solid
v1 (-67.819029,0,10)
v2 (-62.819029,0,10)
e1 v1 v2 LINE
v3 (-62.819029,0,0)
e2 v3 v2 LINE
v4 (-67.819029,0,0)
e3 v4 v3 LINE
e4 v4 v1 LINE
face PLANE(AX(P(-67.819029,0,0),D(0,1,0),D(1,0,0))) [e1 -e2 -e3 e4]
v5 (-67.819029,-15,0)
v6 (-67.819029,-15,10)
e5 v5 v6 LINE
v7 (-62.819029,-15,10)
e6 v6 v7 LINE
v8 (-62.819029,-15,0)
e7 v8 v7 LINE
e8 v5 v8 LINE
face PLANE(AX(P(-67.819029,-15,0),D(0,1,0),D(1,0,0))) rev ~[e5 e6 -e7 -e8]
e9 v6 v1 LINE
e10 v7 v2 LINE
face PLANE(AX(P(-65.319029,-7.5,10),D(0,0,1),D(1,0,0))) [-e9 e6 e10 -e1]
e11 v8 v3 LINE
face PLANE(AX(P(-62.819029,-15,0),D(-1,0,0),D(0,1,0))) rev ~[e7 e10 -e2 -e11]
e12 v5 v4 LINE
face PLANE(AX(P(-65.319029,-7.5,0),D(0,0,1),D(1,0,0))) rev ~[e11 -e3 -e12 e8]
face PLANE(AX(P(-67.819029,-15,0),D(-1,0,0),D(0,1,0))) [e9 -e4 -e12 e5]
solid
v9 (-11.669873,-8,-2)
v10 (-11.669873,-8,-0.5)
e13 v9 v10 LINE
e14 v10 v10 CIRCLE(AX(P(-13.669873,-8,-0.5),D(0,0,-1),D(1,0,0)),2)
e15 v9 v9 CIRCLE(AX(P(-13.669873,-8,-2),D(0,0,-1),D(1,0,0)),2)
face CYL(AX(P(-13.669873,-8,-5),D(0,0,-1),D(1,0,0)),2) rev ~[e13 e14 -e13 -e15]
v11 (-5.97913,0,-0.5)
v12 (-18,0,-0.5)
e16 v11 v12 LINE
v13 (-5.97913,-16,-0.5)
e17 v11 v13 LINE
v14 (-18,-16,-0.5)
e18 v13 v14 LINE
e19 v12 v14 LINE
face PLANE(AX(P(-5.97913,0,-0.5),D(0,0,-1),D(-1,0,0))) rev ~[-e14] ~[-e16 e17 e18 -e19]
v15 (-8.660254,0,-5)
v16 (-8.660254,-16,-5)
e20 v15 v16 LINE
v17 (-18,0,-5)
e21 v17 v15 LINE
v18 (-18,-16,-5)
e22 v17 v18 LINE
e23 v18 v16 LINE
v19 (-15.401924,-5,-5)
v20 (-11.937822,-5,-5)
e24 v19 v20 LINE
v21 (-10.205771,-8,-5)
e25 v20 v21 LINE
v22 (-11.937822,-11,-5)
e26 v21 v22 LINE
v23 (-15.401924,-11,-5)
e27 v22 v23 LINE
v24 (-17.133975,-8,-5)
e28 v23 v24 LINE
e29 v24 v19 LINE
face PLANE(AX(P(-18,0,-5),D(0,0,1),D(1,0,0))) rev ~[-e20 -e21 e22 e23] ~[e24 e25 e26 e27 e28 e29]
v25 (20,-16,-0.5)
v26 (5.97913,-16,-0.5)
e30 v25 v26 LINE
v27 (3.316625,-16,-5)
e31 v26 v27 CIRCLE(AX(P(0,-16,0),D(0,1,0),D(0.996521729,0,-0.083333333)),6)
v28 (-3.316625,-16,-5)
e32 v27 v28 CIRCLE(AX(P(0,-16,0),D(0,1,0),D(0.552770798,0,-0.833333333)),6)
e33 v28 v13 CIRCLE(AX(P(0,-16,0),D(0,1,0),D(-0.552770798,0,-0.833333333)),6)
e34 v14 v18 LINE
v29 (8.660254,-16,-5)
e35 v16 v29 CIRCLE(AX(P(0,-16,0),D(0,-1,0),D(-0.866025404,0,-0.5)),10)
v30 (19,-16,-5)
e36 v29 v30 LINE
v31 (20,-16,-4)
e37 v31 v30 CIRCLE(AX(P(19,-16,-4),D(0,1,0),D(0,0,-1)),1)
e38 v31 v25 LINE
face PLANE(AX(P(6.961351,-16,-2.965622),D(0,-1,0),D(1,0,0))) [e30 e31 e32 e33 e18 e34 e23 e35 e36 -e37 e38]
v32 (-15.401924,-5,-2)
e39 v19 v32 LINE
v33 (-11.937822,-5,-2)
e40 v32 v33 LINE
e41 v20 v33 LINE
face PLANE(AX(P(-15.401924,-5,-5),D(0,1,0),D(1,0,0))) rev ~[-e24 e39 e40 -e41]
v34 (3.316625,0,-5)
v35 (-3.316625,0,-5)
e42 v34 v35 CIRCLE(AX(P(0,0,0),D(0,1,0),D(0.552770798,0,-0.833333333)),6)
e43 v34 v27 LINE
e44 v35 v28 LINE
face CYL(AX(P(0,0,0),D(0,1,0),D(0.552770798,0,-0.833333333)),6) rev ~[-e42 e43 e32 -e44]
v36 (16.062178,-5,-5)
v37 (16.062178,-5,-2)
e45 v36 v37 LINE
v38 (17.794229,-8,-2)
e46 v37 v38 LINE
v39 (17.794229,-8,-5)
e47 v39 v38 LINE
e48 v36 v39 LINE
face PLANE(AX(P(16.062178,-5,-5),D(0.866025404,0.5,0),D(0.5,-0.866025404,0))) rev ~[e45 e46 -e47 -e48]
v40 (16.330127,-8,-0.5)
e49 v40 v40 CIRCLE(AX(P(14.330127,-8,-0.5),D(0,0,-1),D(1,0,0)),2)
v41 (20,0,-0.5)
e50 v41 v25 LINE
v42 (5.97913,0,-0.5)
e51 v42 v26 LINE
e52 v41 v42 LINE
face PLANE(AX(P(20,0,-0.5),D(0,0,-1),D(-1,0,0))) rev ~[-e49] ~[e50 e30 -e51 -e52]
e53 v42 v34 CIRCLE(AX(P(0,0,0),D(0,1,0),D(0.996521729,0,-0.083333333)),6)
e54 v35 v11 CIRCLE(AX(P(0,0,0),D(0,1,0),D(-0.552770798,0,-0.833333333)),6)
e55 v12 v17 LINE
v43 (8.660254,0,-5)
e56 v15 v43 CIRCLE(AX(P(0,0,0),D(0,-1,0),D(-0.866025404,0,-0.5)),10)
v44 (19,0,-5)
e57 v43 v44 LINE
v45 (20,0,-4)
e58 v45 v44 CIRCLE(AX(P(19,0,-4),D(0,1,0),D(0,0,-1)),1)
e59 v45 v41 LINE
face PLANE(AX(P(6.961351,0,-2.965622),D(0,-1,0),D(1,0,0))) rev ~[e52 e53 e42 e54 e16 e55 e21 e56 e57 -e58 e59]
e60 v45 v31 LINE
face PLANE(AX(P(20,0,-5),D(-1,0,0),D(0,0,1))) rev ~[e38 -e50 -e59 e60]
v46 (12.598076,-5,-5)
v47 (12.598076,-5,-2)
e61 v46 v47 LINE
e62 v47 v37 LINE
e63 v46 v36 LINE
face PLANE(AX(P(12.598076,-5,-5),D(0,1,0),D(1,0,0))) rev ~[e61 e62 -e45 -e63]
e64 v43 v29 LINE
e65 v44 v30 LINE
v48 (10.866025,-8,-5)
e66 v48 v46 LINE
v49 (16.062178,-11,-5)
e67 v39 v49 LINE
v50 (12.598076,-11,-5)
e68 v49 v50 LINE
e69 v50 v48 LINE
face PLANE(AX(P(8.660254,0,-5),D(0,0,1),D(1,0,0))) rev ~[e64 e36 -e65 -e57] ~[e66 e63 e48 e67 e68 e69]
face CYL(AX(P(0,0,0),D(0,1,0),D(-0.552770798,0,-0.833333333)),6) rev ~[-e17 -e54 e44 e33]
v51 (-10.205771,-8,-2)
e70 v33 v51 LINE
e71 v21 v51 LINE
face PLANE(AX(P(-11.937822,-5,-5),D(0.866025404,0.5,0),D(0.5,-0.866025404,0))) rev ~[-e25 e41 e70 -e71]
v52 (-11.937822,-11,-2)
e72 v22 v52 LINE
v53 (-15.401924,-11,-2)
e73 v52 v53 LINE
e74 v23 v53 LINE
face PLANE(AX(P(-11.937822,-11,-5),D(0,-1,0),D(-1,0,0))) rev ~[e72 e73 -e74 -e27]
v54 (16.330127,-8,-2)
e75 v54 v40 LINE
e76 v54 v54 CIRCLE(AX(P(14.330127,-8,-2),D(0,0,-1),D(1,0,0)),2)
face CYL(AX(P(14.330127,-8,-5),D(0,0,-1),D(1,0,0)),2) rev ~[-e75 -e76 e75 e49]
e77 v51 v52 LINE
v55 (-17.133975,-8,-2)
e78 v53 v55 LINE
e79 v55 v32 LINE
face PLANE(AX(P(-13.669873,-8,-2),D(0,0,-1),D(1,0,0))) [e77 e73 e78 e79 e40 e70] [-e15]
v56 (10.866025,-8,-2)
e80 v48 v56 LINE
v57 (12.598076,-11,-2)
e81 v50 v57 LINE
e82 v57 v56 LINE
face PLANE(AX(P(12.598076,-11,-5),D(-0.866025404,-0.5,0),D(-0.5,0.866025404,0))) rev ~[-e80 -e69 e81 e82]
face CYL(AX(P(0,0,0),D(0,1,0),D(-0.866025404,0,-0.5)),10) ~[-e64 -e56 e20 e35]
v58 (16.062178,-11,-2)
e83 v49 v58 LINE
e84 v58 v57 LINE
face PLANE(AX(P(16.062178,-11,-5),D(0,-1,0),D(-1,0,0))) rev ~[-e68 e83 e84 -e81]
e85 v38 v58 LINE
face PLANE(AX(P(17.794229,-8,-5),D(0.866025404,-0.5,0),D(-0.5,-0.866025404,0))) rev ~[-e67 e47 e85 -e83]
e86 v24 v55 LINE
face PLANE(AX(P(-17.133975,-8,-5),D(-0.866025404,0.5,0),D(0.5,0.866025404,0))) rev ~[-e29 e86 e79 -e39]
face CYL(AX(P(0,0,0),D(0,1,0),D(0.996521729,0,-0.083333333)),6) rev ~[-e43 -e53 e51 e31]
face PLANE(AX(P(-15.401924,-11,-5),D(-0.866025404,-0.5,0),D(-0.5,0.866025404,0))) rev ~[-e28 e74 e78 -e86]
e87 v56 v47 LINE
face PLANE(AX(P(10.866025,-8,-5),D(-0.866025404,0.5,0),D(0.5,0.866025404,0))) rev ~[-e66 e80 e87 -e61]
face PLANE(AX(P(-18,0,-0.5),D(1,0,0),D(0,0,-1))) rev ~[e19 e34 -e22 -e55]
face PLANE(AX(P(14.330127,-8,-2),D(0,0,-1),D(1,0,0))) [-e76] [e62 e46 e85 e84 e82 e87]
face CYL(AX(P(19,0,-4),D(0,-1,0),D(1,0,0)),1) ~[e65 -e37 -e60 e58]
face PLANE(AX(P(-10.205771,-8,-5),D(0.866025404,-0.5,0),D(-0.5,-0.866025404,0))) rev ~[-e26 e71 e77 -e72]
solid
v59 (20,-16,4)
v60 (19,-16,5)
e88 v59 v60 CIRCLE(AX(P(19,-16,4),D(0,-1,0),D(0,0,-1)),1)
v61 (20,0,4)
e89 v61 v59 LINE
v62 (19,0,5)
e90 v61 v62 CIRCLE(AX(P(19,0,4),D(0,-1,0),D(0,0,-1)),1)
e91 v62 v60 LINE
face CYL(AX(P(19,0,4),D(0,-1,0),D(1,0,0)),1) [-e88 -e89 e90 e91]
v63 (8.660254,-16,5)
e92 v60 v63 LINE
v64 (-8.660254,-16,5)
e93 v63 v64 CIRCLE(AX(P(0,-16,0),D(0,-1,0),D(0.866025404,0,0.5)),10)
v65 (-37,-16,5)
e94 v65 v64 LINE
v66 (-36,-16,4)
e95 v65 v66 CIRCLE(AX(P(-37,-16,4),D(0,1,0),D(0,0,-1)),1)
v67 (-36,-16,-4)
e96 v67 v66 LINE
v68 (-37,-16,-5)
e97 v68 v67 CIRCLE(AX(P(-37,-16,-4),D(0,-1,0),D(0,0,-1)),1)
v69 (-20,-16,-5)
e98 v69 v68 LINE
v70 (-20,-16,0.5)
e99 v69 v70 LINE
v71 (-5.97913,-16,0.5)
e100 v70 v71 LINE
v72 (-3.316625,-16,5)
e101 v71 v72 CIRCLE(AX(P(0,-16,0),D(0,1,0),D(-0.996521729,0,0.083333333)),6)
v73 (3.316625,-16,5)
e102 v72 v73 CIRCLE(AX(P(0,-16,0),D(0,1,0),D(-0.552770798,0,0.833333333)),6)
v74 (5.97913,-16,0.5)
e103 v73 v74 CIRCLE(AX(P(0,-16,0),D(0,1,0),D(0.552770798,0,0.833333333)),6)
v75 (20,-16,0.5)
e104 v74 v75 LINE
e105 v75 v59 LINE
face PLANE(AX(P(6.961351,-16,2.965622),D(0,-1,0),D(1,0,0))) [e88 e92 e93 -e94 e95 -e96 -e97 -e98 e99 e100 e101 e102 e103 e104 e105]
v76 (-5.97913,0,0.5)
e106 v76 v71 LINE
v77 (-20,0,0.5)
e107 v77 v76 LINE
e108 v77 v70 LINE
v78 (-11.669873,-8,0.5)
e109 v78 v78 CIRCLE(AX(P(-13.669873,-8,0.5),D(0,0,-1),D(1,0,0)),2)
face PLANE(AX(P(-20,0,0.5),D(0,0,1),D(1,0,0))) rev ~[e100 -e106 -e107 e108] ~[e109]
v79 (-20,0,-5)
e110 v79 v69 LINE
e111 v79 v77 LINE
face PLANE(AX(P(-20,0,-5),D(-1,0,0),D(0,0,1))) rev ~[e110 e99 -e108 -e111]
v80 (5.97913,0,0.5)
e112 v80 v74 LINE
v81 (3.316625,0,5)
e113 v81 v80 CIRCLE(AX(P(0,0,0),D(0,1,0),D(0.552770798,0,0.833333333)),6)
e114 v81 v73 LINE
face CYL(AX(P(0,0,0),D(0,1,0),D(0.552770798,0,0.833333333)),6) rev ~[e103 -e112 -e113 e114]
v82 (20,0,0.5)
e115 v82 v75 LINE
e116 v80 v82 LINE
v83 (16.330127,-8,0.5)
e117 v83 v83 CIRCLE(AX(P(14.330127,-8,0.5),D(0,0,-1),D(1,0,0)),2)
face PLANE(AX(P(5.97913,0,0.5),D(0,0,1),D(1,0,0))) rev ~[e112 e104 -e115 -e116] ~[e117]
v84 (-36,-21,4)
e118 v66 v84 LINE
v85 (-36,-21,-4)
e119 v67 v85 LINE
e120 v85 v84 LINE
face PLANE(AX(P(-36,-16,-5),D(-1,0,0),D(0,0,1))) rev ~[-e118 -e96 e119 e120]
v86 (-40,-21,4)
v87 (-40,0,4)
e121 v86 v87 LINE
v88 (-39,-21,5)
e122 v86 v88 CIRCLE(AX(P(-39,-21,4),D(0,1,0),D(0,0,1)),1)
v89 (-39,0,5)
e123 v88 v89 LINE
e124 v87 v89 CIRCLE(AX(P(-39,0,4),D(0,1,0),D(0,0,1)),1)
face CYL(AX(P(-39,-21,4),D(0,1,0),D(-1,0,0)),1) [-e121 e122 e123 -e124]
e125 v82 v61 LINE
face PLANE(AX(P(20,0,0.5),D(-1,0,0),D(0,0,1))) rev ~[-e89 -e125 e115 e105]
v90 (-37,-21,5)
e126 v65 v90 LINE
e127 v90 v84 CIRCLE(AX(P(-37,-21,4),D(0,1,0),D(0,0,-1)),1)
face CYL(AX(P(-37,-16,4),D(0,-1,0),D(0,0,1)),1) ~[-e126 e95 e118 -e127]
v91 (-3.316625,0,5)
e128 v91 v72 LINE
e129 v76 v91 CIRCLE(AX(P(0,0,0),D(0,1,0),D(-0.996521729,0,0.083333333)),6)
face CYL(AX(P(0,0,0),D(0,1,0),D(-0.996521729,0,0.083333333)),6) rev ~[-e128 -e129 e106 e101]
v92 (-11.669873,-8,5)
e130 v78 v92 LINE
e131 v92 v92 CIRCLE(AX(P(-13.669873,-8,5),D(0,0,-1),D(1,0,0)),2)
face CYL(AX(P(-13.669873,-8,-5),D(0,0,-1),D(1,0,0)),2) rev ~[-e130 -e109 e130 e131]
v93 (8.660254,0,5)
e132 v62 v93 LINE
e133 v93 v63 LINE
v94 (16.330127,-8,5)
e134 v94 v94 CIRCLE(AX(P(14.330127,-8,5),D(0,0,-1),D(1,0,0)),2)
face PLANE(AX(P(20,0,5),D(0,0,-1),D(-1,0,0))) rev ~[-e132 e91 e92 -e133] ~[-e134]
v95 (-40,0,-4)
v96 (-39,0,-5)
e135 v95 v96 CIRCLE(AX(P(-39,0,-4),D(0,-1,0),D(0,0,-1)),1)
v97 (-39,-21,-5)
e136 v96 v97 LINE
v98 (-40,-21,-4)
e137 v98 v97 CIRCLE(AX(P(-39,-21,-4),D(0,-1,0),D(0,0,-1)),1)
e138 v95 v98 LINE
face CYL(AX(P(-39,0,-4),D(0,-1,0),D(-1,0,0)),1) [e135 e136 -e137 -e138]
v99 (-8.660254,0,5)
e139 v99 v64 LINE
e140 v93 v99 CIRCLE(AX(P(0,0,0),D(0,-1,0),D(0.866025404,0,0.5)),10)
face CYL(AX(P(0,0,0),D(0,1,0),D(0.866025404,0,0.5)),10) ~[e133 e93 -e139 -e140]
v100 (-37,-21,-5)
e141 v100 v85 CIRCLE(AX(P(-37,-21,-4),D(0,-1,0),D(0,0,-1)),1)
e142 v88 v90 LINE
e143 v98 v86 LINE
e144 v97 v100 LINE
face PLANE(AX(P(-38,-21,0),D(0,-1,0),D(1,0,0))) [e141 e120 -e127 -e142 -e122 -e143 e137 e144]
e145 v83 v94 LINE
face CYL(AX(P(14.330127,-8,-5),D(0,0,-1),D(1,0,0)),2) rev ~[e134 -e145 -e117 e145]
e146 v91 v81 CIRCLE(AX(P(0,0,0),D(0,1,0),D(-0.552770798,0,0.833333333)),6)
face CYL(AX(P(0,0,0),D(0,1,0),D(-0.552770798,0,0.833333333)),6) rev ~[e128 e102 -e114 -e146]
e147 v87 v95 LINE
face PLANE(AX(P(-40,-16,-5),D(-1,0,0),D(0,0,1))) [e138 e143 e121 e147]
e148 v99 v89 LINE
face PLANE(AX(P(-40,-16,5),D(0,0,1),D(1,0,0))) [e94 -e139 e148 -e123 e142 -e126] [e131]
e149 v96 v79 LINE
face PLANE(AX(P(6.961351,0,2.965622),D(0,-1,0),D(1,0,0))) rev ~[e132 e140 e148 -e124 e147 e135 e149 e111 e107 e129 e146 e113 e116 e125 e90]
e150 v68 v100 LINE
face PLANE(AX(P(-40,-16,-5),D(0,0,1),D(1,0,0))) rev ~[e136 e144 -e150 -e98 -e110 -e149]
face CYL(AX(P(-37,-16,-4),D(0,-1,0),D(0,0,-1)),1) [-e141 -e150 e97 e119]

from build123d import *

# Parameters (mm, degrees)
F1_DEPTH  = 16
F2_W      = 4
F2_H      = 10
F3_DEPTH  = 5
F4_R      = 2
F5_DEPTH  = 25
F6_R      = 2
F7_DEPTH  = 3
F8_R      = 1
F8_2_R    = 1
F9_W      = 5
F9_H      = 15
F10_DEPTH = 10


with BuildPart() as f1:
    # F0 (on Front) → F1 (new body)
    with BuildSketch(Plane.XZ):
        with BuildLine():
            ThreePointArc((3.3166247904, 5), (5.1638421749, 3.0552796914), (5.9791303716, 0.5))
            Line((5.9791303716, 0.5), (9.9874921777, 0.5))
            ThreePointArc((9.9874921777, 0.5), (9.5915123797, 2.828938011), (8.6602540378, 5))
            Line((8.6602540378, 5), (3.3166247904, 5))
        make_face()
        with BuildLine():
            ThreePointArc((-3.3166247904, 5), (0, 6), (3.3166247904, 5))
            Line((3.3166247904, 5), (8.6602540378, 5))
            ThreePointArc((8.6602540378, 5), (0, 10), (-8.6602540378, 5))
            Line((-8.6602540378, 5), (-3.3166247904, 5))
        make_face()
        with BuildLine():
            ThreePointArc((8.6602540378, 5), (9.5915123797, 2.828938011), (9.9874921777, 0.5))
            Line((9.9874921777, 0.5), (20, 0.5))
            Line((20, 0.5), (20, 5))
            Line((20, 5), (8.6602540378, 5))
        make_face()
        with BuildLine():
            Line((-9.9874921777, 0.5), (-5.9791303716, 0.5))
            ThreePointArc((-5.9791303716, 0.5), (-5.1638421749, 3.0552796914), (-3.3166247904, 5))
            Line((-3.3166247904, 5), (-8.6602540378, 5))
            ThreePointArc((-8.6602540378, 5), (-9.5915123797, 2.828938011), (-9.9874921777, 0.5))
        make_face()
        with BuildLine():
            Line((-18, 0.5), (-9.9874921777, 0.5))
            ThreePointArc((-9.9874921777, 0.5), (-9.5915123797, 2.828938011), (-8.6602540378, 5))
            Line((-8.6602540378, 5), (-40, 5))
            Line((-40, 5), (-40, -5))
            Line((-40, -5), (-20, -5))
            Line((-20, -5), (-20, -0.5))
            Line((-20, -0.5), (-20, 0.5))
            Line((-20, 0.5), (-18, 0.5))
        make_face()
    extrude(amount=F1_DEPTH)

    # F2 (on face) → F3 (join)
    with BuildSketch(Plane.XZ.offset(16)):
        with Locations((-38, 0)):
            Rectangle(F2_W, F2_H)
    extrude(amount=F3_DEPTH)


with BuildPart() as f1b:
    # F0 (on Front) → F1, piece 2 (new body)
    with BuildSketch(Plane.XZ):
        with BuildLine():
            Line((9.9874921777, -0.5), (5.9791303716, -0.5))
            ThreePointArc((5.9791303716, -0.5), (5.1638421749, -3.0552796914), (3.3166247904, -5))
            Line((3.3166247904, -5), (8.6602540378, -5))
            ThreePointArc((8.6602540378, -5), (9.5915123797, -2.828938011), (9.9874921777, -0.5))
        make_face()
        with BuildLine():
            Line((8.6602540378, -5), (3.3166247904, -5))
            ThreePointArc((3.3166247904, -5), (0, -6), (-3.3166247904, -5))
            Line((-3.3166247904, -5), (-8.6602540378, -5))
            ThreePointArc((-8.6602540378, -5), (0, -10), (8.6602540378, -5))
        make_face()
        with BuildLine():
            Line((20, -0.5), (9.9874921777, -0.5))
            ThreePointArc((9.9874921777, -0.5), (9.5915123797, -2.828938011), (8.6602540378, -5))
            Line((8.6602540378, -5), (20, -5))
            Line((20, -5), (20, -0.5))
        make_face()
        with BuildLine():
            ThreePointArc((-3.3166247904, -5), (-5.1638421749, -3.0552796914), (-5.9791303716, -0.5))
            Line((-5.9791303716, -0.5), (-9.9874921777, -0.5))
            ThreePointArc((-9.9874921777, -0.5), (-9.5915123797, -2.828938011), (-8.6602540378, -5))
            Line((-8.6602540378, -5), (-3.3166247904, -5))
        make_face()
        with BuildLine():
            ThreePointArc((-8.6602540378, -5), (-9.5915123797, -2.828938011), (-9.9874921777, -0.5))
            Line((-9.9874921777, -0.5), (-18, -0.5))
            Line((-18, -0.5), (-18, -5))
            Line((-18, -5), (-8.6602540378, -5))
        make_face()
    extrude(amount=F1_DEPTH)


with BuildPart() as f5_tool:
    # F4 (on face) → F5 (new body)
    with BuildSketch(Plane(origin=(0, 0, -5), x_dir=(1, 0, 0), z_dir=(0, 0, -1))):
        with Locations((-13.6698729811, 8)):
            Circle(F4_R)
        with Locations((14.3301270189, 8)):
            Circle(F4_R)
    extrude(amount=-F5_DEPTH)


with BuildPart() as f1_1:
    add(f1.part)

    # F5: cut by f5_tool
    add(f5_tool.part, mode=Mode.SUBTRACT)

    # F8
    f8_edges = [f1_1.edges().sort_by_distance(p)[0] for p in [
        (20, -8, 5),
        (-40, -10.5, -5),
        (-40, -10.5, 5),
        (-36, -18.5, -5),
        (-36, -18.5, 5),
    ]]
    fillet(f8_edges, radius=F8_R)


with BuildPart() as f1b_1:
    add(f1b.part)

    # F5: cut by f5_tool
    add(f5_tool.part, mode=Mode.SUBTRACT)

    # F6 (on face) → F7 (cut)
    with BuildSketch(Plane(origin=(0, 0, -5), x_dir=(1, 0, 0), z_dir=(0, 0, -1))):
        Polygon((-15.4019237886, 5), (-11.9378221735, 5), (-10.2057713659, 8), (-11.9378221735, 11), (-15.4019237886, 11), (-17.1339745962, 8), align=None)
        with Locations((-13.6698729811, 8)):
            Circle(F6_R, mode=Mode.SUBTRACT)
        Polygon((12.5980762114, 5), (16.0621778265, 5), (17.7942286341, 8), (16.0621778265, 11), (12.5980762114, 11), (10.8660254038, 8), align=None)
        with Locations((14.3301270189, 8)):
            Circle(F6_R, mode=Mode.SUBTRACT)
    extrude(amount=-F7_DEPTH, mode=Mode.SUBTRACT)

    # F8#2
    f8_2_edges = [f1b_1.edges().sort_by_distance(p)[0] for p in [
        (20, -8, -5),
    ]]
    fillet(f8_2_edges, radius=F8_2_R)


with BuildPart() as f10:
    # F9 (on Top) → F10 (new body)
    with BuildSketch(Plane.XY):
        with Locations((-65.3190290928, -7.5)):
            Rectangle(F9_W, F9_H)
    extrude(amount=F10_DEPTH)


solid = Compound([f1_1.part, f1b_1.part, f10.part])
